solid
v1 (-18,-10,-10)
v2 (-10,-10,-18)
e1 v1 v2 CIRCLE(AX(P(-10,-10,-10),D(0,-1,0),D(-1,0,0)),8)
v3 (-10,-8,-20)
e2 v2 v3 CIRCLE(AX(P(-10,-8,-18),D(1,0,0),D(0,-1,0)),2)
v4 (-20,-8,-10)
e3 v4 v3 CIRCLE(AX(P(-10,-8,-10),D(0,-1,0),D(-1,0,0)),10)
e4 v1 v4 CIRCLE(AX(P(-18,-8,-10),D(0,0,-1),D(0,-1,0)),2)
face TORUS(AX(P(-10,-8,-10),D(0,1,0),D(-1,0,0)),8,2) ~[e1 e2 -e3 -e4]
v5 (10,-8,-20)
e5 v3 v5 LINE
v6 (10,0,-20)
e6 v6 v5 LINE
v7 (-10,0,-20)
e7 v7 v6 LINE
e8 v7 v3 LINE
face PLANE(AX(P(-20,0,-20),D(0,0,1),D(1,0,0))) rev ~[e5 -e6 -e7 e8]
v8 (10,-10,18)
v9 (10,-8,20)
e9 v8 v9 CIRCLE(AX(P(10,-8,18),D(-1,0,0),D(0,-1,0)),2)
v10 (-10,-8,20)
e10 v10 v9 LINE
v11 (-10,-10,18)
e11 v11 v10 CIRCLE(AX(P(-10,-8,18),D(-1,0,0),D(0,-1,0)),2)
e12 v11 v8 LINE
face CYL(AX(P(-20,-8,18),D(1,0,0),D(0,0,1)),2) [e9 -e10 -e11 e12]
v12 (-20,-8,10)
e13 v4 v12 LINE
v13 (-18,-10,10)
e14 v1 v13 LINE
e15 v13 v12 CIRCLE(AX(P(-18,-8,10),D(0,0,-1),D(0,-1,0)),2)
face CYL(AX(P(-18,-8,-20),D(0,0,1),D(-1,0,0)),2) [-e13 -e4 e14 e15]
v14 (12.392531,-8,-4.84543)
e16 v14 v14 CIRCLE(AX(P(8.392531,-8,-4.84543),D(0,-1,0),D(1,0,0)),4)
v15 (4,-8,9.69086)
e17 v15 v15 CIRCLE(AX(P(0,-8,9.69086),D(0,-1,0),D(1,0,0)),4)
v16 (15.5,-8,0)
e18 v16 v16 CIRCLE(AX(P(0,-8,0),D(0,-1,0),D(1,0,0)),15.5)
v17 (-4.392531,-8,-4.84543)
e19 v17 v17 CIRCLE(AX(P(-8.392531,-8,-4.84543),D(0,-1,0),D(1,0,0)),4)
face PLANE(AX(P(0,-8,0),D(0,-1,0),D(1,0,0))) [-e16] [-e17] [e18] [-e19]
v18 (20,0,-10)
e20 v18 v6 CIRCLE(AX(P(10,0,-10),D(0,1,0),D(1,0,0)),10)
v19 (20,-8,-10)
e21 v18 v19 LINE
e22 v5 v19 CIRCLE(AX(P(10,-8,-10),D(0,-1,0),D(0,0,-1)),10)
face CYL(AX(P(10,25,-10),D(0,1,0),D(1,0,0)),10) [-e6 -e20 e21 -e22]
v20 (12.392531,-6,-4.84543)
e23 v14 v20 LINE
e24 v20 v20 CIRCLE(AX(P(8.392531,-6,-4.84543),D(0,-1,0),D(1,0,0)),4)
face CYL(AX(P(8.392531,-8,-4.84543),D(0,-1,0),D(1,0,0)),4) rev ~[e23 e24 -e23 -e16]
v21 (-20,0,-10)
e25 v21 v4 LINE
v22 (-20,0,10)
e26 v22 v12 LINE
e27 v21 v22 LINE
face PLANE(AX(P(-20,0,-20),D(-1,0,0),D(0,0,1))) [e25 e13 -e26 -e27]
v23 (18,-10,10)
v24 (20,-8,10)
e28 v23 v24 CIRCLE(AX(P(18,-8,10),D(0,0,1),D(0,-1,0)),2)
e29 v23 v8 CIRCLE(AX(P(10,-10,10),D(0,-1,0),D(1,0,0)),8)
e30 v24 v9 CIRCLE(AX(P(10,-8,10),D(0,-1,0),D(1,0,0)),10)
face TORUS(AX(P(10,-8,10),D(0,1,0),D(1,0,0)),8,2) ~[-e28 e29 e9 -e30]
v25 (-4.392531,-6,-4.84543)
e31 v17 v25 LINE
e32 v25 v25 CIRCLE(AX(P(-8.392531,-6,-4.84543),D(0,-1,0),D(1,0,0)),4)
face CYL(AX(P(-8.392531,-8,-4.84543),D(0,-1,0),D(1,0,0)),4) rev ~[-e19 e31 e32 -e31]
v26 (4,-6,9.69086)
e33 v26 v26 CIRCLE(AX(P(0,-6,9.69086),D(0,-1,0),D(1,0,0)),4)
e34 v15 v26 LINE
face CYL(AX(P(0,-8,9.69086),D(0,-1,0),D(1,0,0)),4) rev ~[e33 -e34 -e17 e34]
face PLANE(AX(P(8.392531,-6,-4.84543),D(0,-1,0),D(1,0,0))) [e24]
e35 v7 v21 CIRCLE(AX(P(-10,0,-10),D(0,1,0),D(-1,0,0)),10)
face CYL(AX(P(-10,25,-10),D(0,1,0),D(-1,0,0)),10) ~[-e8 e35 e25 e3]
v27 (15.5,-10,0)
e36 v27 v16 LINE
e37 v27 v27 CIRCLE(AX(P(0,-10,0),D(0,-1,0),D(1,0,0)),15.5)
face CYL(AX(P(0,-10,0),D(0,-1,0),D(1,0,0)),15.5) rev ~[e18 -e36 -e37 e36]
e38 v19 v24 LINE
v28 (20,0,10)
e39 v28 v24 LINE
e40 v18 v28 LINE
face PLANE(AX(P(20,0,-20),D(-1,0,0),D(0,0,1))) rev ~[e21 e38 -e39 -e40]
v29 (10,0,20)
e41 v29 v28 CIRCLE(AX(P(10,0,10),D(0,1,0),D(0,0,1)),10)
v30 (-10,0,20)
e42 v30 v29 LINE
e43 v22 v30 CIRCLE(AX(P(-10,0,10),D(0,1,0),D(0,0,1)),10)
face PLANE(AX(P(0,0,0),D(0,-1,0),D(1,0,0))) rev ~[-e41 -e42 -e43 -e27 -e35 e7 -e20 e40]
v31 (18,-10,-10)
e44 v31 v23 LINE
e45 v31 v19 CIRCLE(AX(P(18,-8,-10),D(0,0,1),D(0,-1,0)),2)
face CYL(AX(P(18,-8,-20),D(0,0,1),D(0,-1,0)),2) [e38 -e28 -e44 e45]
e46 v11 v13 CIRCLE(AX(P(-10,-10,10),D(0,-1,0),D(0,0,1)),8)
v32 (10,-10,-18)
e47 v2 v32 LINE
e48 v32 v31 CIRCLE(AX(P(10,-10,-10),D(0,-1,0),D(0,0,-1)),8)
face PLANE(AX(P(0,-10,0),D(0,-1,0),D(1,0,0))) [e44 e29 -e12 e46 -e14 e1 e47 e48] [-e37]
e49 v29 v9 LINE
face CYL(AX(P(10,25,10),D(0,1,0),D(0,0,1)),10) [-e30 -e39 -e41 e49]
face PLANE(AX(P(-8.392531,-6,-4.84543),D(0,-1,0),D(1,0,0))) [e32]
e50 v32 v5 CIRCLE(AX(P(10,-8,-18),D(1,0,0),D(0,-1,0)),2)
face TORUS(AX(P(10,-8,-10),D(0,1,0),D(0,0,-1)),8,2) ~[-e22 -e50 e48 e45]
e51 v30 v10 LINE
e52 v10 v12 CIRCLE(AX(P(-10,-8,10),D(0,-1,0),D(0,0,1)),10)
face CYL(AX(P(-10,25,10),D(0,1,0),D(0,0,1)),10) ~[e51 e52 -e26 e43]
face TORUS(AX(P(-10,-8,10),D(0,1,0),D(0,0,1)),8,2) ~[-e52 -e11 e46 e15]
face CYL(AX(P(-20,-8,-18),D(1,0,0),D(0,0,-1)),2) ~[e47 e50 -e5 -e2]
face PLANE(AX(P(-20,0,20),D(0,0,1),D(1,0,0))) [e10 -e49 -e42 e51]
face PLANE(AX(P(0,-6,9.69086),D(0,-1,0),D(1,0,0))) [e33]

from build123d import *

# Parameters (mm, degrees)
F0_W         = 40
F0_H         = 40
F1_DEPTH     = 10
F2_R         = 15.5
F3_DEPTH     = 2
F4_R         = 4
F5_DEPTH     = 2
F6_R         = 2
F7_T1_DEPTH  = 35
F7_T4_ANGLE  = 90
F7_T6_ANGLE  = 90
F7_T8_ANGLE  = 90
F7_T10_ANGLE = 90


# Not quite as in the source:
# - a fillet or chamfer that OpenCascade refuses, or shapes differently, is made with other operations: its cross-section is extruded or revolved along the edge and cut away or added


with BuildPart() as f1:
    # F0 (on Front) → F1 (new body)
    with BuildSketch(Plane.XZ):
        Rectangle(F0_W, F0_H)
    extrude(amount=F1_DEPTH)

    # F2 (on face) → F3 (cut)
    with BuildSketch(Plane.XZ.offset(10)):
        Circle(F2_R)
    extrude(amount=-F3_DEPTH, mode=Mode.SUBTRACT)

    # F4 (on face) → F5 (cut)
    with BuildSketch(Plane.XZ.offset(8)):
        with Locations((0, 9.6908602864)):
            Circle(F4_R)
        with Locations((-8.3925311925, -4.8454301432)):
            Circle(F4_R)
        with Locations((8.3925311925, -4.8454301432)):
            Circle(F4_R)
    extrude(amount=-F5_DEPTH, mode=Mode.SUBTRACT)

    # F6
    f6_edges = [f1.edges().sort_by_distance(p)[0] for p in [
        (0, -10, 20),
        (-20, -10, 0),
        (20, -10, 0),
        (0, -10, -20),
    ]]
    fillet(f6_edges, radius=F6_R)

    # F7: fillet of radius 10 on 4 edges, made by hand

    # F7_s2 → F7_t1 (cut)
    with BuildSketch(Plane.XZ.offset(-25)):
        with BuildLine():
            ThreePointArc((10, 20), (17.0710678119, 17.0710678119), (20, 10))
            Line((20, 10), (20, 20))
            Line((20, 20), (10, 20))
        make_face()
        with BuildLine():
            ThreePointArc((-10, 20), (-17.0710678119, 17.0710678119), (-20, 10))
            Line((-20, 10), (-20, 20))
            Line((-20, 20), (-10, 20))
        make_face()
        with BuildLine():
            ThreePointArc((20, -10), (17.0710678119, -17.0710678119), (10, -20))
            Line((10, -20), (20, -20))
            Line((20, -20), (20, -10))
        make_face()
        with BuildLine():
            ThreePointArc((-20, -10), (-17.0710678119, -17.0710678119), (-10, -20))
            Line((-10, -20), (-20, -20))
            Line((-20, -20), (-20, -10))
        make_face()
    extrude(amount=F7_T1_DEPTH, mode=Mode.SUBTRACT)

    # F7_s3 → F7_t4 (revolve, cut)
    with BuildSketch(Plane.XY.offset(-10)):
        with BuildLine():
            ThreePointArc((-18, -10), (-19.4142135624, -9.4142135624), (-20, -8))
            Line((-20, -8), (-20, -10))
            Line((-20, -10), (-18, -10))
        make_face()
    revolve(axis=Axis((-10, -10, -10), (0, -1, 0)), revolution_arc=F7_T4_ANGLE, mode=Mode.SUBTRACT)

    # F7_s5 → F7_t6 (revolve, cut)
    with BuildSketch(Plane.YZ.offset(10)):
        with BuildLine():
            ThreePointArc((-10, -18), (-9.4142135624, -19.4142135624), (-8, -20))
            Line((-8, -20), (-10, -20))
            Line((-10, -20), (-10, -18))
        make_face()
    revolve(axis=Axis((10, -10, -10), (0, -1, 0)), revolution_arc=F7_T6_ANGLE, mode=Mode.SUBTRACT)

    # F7_s7 → F7_t8 (revolve, cut)
    with BuildSketch(Plane.YZ.offset(-10)):
        with BuildLine():
            ThreePointArc((-10, 18), (-9.4142135624, 19.4142135624), (-8, 20))
            Line((-8, 20), (-10, 20))
            Line((-10, 20), (-10, 18))
        make_face()
    revolve(axis=Axis((-10, -10, 10), (0, -1, 0)), revolution_arc=F7_T8_ANGLE, mode=Mode.SUBTRACT)

    # F7_s9 → F7_t10 (revolve, cut)
    with BuildSketch(Plane.XY.offset(10)):
        with BuildLine():
            ThreePointArc((18, -10), (19.4142135624, -9.4142135624), (20, -8))
            Line((20, -8), (20, -10))
            Line((20, -10), (18, -10))
        make_face()
    revolve(axis=Axis((10, -10, 10), (0, -1, 0)), revolution_arc=F7_T10_ANGLE, mode=Mode.SUBTRACT)


solid = f1.part
